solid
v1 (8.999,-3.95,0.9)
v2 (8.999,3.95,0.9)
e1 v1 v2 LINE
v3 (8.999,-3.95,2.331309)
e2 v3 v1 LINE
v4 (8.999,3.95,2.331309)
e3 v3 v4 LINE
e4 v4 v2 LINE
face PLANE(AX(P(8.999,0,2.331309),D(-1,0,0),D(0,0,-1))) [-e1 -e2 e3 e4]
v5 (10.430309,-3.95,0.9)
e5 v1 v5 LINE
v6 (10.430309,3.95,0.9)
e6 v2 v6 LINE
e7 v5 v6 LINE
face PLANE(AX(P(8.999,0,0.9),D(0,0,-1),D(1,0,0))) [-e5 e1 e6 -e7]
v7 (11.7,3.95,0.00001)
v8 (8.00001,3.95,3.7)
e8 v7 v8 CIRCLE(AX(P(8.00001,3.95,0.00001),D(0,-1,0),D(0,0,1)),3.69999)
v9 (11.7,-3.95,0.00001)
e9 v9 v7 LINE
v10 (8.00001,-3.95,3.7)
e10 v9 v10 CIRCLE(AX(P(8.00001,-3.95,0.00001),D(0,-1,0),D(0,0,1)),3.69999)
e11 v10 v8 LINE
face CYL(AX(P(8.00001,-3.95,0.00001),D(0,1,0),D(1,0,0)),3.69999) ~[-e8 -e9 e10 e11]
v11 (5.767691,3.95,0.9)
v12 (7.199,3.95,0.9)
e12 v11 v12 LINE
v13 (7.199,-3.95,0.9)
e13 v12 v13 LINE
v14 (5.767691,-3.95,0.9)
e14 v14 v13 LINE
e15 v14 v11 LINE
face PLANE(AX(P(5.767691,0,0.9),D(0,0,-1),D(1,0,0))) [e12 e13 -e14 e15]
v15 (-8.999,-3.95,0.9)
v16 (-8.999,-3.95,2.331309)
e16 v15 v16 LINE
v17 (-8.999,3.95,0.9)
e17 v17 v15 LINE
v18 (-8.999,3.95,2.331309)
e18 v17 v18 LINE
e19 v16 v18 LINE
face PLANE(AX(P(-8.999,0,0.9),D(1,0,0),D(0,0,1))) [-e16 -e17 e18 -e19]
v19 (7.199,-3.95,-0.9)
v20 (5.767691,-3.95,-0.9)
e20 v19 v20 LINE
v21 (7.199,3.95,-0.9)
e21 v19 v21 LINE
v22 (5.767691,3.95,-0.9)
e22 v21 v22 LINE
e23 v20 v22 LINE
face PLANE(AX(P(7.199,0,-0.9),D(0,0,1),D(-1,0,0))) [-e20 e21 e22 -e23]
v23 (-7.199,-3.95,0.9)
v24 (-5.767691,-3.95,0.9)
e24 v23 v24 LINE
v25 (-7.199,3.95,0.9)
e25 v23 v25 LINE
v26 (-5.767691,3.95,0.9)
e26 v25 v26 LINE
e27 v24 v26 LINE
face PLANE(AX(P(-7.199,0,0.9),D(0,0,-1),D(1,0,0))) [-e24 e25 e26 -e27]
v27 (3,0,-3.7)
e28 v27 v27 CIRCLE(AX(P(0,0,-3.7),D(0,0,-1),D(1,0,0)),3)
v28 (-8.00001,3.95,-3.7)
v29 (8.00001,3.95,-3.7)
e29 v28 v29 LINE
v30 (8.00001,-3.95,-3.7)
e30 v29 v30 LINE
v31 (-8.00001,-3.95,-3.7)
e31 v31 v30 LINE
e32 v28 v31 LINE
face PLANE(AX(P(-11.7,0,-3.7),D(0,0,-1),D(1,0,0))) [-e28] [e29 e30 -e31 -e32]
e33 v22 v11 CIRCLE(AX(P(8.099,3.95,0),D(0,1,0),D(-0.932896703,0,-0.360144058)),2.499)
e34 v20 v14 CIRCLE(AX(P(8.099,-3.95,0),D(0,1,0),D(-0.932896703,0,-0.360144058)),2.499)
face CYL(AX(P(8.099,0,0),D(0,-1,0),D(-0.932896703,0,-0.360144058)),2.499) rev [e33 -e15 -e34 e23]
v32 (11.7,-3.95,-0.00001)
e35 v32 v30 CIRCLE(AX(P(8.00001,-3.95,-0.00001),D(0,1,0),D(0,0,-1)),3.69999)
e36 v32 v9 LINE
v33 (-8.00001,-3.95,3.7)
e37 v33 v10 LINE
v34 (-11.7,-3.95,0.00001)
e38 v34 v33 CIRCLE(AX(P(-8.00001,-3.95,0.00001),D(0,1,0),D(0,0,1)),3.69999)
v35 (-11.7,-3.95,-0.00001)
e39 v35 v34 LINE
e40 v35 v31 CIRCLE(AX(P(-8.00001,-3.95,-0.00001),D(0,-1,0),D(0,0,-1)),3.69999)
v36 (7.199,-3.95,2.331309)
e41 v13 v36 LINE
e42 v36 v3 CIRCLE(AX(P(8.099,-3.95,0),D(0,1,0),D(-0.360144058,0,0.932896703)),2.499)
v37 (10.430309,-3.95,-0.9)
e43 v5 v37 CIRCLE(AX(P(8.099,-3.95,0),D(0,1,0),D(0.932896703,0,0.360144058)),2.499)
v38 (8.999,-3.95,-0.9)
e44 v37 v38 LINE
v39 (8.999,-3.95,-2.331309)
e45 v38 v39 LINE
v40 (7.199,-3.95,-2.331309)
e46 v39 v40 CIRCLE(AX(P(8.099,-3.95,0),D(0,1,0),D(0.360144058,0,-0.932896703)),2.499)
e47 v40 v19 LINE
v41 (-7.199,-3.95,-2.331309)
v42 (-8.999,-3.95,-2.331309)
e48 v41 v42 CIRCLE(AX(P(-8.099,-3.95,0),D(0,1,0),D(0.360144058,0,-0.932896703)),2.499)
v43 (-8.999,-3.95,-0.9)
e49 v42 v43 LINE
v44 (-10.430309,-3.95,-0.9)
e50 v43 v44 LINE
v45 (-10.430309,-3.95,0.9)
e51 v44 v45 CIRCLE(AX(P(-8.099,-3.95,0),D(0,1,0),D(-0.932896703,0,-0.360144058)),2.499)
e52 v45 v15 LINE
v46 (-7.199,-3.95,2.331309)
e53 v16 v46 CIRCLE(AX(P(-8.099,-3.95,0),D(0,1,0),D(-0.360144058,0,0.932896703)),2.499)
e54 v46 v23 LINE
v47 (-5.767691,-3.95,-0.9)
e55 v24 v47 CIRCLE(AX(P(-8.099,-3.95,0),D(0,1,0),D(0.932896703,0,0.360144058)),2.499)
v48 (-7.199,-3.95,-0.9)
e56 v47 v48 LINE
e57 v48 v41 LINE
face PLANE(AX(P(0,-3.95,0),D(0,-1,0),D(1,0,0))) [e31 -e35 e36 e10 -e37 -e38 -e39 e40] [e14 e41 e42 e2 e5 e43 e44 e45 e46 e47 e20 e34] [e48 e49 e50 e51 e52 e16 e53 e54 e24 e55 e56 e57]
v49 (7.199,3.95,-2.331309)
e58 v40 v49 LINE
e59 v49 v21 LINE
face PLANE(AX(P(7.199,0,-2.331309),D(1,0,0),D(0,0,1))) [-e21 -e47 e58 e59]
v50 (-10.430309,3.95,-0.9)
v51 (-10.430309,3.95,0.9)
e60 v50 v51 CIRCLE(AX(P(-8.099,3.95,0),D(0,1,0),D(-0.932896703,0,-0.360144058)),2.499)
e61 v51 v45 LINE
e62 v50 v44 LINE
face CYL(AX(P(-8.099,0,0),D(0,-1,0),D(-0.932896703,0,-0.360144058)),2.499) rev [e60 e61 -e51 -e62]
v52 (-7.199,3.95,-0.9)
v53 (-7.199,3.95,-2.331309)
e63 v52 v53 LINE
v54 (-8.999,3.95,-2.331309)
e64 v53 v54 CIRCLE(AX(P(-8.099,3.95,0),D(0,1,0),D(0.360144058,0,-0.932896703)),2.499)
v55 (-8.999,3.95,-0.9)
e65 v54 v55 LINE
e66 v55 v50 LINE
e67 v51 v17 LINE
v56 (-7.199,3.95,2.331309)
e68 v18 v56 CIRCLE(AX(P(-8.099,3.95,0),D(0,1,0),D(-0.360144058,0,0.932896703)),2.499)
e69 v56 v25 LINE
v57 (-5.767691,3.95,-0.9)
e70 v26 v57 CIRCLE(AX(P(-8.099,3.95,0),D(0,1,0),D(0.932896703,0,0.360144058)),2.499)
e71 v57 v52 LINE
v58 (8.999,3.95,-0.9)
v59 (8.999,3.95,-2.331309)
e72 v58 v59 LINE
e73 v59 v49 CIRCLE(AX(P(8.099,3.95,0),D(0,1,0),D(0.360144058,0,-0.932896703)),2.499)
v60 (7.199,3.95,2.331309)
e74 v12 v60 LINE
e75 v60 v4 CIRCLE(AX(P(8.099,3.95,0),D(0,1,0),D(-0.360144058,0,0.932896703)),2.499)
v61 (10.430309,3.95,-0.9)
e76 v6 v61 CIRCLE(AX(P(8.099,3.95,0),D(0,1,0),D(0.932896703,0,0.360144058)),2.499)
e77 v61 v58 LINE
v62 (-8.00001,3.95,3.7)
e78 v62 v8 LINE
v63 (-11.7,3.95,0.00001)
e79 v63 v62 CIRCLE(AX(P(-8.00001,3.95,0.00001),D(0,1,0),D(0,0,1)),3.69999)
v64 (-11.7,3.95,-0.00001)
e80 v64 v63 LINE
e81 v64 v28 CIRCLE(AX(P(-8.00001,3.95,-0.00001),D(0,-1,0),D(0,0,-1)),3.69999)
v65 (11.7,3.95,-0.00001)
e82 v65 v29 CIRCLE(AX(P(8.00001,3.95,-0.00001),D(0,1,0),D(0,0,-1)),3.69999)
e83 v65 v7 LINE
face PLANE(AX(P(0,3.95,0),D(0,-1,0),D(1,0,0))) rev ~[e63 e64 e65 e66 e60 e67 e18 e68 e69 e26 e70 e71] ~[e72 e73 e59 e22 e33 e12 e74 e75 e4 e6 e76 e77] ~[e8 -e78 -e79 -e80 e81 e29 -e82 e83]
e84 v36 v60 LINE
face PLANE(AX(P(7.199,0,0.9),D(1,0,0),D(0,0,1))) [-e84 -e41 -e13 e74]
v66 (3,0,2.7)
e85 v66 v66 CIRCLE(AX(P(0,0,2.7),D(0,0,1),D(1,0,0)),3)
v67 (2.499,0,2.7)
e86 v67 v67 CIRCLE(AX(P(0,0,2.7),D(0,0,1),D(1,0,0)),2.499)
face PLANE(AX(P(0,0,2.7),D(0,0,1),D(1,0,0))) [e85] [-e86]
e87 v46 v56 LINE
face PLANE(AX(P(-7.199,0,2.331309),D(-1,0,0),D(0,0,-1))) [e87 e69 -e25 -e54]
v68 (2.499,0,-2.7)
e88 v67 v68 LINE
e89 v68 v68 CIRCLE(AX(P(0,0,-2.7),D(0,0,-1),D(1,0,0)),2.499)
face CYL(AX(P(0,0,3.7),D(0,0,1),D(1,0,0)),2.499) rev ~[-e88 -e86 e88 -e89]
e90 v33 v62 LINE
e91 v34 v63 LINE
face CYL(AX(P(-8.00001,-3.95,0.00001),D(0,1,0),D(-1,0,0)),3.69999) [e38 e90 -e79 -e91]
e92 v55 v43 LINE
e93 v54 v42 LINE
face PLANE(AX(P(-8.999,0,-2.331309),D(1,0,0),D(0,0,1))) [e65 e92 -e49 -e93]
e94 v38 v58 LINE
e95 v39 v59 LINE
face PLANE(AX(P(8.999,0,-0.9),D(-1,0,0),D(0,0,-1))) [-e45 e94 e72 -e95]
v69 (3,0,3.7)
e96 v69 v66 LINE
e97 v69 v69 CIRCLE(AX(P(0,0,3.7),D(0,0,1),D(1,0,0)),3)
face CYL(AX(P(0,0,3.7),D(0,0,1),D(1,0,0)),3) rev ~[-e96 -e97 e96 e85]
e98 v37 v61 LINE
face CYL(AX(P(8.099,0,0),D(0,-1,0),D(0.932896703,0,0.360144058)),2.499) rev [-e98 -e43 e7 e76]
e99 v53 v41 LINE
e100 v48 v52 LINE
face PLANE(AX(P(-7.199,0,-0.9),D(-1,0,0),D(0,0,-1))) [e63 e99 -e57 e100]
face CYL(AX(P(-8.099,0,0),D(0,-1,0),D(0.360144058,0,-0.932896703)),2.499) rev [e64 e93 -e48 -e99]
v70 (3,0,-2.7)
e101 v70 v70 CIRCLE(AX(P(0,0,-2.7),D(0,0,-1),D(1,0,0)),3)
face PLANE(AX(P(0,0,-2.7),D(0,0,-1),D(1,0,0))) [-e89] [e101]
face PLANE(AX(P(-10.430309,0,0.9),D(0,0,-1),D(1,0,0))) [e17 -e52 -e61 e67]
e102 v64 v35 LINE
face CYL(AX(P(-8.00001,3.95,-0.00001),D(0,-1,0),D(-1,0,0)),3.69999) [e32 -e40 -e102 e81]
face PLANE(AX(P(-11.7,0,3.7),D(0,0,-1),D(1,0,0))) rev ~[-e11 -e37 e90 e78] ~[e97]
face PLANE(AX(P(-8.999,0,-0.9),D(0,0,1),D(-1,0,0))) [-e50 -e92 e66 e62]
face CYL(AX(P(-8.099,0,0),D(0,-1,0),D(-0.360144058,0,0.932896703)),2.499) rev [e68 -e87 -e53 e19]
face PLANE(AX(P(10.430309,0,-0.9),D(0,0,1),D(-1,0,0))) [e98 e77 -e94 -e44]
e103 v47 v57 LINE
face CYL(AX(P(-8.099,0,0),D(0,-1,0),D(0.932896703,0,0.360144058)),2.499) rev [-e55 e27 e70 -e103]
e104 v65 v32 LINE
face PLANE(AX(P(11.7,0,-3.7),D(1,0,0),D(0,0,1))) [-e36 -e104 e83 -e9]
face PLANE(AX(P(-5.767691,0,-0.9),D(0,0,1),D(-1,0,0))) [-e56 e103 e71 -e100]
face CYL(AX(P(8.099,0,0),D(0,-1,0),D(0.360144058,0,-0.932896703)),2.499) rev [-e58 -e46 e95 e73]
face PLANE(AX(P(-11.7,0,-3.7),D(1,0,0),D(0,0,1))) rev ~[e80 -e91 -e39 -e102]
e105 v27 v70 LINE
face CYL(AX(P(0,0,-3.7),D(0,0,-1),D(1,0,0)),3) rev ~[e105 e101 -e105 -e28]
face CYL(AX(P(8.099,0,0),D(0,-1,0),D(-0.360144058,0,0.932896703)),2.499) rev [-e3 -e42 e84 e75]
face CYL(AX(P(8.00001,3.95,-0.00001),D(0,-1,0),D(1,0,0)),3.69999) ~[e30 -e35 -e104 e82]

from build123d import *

# Parameters (mm, degrees)
F0_W     = 23.4
F0_H     = 7.4
F1_DEPTH = 3.95
F2_R     = 3.69999
F3_R     = 2.499
F4_DEPTH = 25
F3_R_2   = 3
F5_DEPTH = 1
F6_R     = 3
F6_R_2   = 2.499
F7_DEPTH = 1


# Not quite as in the source:
# - a fillet or chamfer is up to 0.001 mm smaller than in the source, because OpenCascade refuses the exact size


with BuildPart() as f1:
    # F0 (on Front) → F1 (new body, symmetric)
    with BuildSketch(Plane.XZ):
        Rectangle(F0_W, F0_H)
        with BuildLine():
            ThreePointArc((-7.199, -2.3313088598), (-8.099, -2.499), (-8.999, -2.3313088598))
            Line((-8.999, -2.3313088598), (-8.999, -0.9))
            Line((-8.999, -0.9), (-10.4303088598, -0.9))
            ThreePointArc((-10.4303088598, -0.9), (-10.598, 0), (-10.4303088598, 0.9))
            Line((-10.4303088598, 0.9), (-8.999, 0.9))
            Line((-8.999, 0.9), (-8.999, 2.3313088598))
            ThreePointArc((-8.999, 2.3313088598), (-8.099, 2.499), (-7.199, 2.3313088598))
            Line((-7.199, 2.3313088598), (-7.199, 0.9))
            Line((-7.199, 0.9), (-5.7676911402, 0.9))
            ThreePointArc((-5.7676911402, 0.9), (-5.6, 0), (-5.7676911402, -0.9))
            Line((-5.7676911402, -0.9), (-7.199, -0.9))
            Line((-7.199, -0.9), (-7.199, -2.3313088598))
        make_face(mode=Mode.SUBTRACT)
        with BuildLine():
            Line((7.199, 0.9), (7.199, 2.3313088598))
            ThreePointArc((7.199, 2.3313088598), (8.099, 2.499), (8.999, 2.3313088598))
            Line((8.999, 2.3313088598), (8.999, 0.9))
            Line((8.999, 0.9), (10.4303088598, 0.9))
            ThreePointArc((10.4303088598, 0.9), (10.598, 0), (10.4303088598, -0.9))
            Line((10.4303088598, -0.9), (8.999, -0.9))
            Line((8.999, -0.9), (8.999, -2.3313088598))
            ThreePointArc((8.999, -2.3313088598), (8.099, -2.499), (7.199, -2.3313088598))
            Line((7.199, -2.3313088598), (7.199, -0.9))
            Line((7.199, -0.9), (5.7676911402, -0.9))
            ThreePointArc((5.7676911402, -0.9), (5.6, 0), (5.7676911402, 0.9))
            Line((5.7676911402, 0.9), (7.199, 0.9))
        make_face(mode=Mode.SUBTRACT)
    extrude(amount=F1_DEPTH, both=True)

    # F2 (radius 3.7 in the source; OpenCascade refuses exactly that, so slightly less here)
    f2_edges = [f1.edges().sort_by_distance(p)[0] for p in [
        (-11.7, 0, -3.7),
        (-11.7, 0, 3.7),
        (11.7, 0, 3.7),
        (11.7, 0, -3.7),
    ]]
    fillet(f2_edges, radius=F2_R)

    # F3 (on face) → F4 (cut)
    with BuildSketch(Plane.XY.offset(3.7)):
        Circle(F3_R)
    extrude(amount=-F4_DEPTH, mode=Mode.SUBTRACT)

    # F3 (on face) → F5 (cut)
    with BuildSketch(Plane.XY.offset(3.7)):
        Circle(F3_R_2)
        Circle(F3_R, mode=Mode.SUBTRACT)
    extrude(amount=-F5_DEPTH, mode=Mode.SUBTRACT)

    # F6 (on face) → F7 (cut)
    with BuildSketch(Plane(origin=(0, 0, -3.7), x_dir=(1, 0, 0), z_dir=(0, 0, -1))):
        Circle(F6_R)
        Circle(F6_R_2, mode=Mode.SUBTRACT)
    extrude(amount=-F7_DEPTH, mode=Mode.SUBTRACT)


solid = f1.part
